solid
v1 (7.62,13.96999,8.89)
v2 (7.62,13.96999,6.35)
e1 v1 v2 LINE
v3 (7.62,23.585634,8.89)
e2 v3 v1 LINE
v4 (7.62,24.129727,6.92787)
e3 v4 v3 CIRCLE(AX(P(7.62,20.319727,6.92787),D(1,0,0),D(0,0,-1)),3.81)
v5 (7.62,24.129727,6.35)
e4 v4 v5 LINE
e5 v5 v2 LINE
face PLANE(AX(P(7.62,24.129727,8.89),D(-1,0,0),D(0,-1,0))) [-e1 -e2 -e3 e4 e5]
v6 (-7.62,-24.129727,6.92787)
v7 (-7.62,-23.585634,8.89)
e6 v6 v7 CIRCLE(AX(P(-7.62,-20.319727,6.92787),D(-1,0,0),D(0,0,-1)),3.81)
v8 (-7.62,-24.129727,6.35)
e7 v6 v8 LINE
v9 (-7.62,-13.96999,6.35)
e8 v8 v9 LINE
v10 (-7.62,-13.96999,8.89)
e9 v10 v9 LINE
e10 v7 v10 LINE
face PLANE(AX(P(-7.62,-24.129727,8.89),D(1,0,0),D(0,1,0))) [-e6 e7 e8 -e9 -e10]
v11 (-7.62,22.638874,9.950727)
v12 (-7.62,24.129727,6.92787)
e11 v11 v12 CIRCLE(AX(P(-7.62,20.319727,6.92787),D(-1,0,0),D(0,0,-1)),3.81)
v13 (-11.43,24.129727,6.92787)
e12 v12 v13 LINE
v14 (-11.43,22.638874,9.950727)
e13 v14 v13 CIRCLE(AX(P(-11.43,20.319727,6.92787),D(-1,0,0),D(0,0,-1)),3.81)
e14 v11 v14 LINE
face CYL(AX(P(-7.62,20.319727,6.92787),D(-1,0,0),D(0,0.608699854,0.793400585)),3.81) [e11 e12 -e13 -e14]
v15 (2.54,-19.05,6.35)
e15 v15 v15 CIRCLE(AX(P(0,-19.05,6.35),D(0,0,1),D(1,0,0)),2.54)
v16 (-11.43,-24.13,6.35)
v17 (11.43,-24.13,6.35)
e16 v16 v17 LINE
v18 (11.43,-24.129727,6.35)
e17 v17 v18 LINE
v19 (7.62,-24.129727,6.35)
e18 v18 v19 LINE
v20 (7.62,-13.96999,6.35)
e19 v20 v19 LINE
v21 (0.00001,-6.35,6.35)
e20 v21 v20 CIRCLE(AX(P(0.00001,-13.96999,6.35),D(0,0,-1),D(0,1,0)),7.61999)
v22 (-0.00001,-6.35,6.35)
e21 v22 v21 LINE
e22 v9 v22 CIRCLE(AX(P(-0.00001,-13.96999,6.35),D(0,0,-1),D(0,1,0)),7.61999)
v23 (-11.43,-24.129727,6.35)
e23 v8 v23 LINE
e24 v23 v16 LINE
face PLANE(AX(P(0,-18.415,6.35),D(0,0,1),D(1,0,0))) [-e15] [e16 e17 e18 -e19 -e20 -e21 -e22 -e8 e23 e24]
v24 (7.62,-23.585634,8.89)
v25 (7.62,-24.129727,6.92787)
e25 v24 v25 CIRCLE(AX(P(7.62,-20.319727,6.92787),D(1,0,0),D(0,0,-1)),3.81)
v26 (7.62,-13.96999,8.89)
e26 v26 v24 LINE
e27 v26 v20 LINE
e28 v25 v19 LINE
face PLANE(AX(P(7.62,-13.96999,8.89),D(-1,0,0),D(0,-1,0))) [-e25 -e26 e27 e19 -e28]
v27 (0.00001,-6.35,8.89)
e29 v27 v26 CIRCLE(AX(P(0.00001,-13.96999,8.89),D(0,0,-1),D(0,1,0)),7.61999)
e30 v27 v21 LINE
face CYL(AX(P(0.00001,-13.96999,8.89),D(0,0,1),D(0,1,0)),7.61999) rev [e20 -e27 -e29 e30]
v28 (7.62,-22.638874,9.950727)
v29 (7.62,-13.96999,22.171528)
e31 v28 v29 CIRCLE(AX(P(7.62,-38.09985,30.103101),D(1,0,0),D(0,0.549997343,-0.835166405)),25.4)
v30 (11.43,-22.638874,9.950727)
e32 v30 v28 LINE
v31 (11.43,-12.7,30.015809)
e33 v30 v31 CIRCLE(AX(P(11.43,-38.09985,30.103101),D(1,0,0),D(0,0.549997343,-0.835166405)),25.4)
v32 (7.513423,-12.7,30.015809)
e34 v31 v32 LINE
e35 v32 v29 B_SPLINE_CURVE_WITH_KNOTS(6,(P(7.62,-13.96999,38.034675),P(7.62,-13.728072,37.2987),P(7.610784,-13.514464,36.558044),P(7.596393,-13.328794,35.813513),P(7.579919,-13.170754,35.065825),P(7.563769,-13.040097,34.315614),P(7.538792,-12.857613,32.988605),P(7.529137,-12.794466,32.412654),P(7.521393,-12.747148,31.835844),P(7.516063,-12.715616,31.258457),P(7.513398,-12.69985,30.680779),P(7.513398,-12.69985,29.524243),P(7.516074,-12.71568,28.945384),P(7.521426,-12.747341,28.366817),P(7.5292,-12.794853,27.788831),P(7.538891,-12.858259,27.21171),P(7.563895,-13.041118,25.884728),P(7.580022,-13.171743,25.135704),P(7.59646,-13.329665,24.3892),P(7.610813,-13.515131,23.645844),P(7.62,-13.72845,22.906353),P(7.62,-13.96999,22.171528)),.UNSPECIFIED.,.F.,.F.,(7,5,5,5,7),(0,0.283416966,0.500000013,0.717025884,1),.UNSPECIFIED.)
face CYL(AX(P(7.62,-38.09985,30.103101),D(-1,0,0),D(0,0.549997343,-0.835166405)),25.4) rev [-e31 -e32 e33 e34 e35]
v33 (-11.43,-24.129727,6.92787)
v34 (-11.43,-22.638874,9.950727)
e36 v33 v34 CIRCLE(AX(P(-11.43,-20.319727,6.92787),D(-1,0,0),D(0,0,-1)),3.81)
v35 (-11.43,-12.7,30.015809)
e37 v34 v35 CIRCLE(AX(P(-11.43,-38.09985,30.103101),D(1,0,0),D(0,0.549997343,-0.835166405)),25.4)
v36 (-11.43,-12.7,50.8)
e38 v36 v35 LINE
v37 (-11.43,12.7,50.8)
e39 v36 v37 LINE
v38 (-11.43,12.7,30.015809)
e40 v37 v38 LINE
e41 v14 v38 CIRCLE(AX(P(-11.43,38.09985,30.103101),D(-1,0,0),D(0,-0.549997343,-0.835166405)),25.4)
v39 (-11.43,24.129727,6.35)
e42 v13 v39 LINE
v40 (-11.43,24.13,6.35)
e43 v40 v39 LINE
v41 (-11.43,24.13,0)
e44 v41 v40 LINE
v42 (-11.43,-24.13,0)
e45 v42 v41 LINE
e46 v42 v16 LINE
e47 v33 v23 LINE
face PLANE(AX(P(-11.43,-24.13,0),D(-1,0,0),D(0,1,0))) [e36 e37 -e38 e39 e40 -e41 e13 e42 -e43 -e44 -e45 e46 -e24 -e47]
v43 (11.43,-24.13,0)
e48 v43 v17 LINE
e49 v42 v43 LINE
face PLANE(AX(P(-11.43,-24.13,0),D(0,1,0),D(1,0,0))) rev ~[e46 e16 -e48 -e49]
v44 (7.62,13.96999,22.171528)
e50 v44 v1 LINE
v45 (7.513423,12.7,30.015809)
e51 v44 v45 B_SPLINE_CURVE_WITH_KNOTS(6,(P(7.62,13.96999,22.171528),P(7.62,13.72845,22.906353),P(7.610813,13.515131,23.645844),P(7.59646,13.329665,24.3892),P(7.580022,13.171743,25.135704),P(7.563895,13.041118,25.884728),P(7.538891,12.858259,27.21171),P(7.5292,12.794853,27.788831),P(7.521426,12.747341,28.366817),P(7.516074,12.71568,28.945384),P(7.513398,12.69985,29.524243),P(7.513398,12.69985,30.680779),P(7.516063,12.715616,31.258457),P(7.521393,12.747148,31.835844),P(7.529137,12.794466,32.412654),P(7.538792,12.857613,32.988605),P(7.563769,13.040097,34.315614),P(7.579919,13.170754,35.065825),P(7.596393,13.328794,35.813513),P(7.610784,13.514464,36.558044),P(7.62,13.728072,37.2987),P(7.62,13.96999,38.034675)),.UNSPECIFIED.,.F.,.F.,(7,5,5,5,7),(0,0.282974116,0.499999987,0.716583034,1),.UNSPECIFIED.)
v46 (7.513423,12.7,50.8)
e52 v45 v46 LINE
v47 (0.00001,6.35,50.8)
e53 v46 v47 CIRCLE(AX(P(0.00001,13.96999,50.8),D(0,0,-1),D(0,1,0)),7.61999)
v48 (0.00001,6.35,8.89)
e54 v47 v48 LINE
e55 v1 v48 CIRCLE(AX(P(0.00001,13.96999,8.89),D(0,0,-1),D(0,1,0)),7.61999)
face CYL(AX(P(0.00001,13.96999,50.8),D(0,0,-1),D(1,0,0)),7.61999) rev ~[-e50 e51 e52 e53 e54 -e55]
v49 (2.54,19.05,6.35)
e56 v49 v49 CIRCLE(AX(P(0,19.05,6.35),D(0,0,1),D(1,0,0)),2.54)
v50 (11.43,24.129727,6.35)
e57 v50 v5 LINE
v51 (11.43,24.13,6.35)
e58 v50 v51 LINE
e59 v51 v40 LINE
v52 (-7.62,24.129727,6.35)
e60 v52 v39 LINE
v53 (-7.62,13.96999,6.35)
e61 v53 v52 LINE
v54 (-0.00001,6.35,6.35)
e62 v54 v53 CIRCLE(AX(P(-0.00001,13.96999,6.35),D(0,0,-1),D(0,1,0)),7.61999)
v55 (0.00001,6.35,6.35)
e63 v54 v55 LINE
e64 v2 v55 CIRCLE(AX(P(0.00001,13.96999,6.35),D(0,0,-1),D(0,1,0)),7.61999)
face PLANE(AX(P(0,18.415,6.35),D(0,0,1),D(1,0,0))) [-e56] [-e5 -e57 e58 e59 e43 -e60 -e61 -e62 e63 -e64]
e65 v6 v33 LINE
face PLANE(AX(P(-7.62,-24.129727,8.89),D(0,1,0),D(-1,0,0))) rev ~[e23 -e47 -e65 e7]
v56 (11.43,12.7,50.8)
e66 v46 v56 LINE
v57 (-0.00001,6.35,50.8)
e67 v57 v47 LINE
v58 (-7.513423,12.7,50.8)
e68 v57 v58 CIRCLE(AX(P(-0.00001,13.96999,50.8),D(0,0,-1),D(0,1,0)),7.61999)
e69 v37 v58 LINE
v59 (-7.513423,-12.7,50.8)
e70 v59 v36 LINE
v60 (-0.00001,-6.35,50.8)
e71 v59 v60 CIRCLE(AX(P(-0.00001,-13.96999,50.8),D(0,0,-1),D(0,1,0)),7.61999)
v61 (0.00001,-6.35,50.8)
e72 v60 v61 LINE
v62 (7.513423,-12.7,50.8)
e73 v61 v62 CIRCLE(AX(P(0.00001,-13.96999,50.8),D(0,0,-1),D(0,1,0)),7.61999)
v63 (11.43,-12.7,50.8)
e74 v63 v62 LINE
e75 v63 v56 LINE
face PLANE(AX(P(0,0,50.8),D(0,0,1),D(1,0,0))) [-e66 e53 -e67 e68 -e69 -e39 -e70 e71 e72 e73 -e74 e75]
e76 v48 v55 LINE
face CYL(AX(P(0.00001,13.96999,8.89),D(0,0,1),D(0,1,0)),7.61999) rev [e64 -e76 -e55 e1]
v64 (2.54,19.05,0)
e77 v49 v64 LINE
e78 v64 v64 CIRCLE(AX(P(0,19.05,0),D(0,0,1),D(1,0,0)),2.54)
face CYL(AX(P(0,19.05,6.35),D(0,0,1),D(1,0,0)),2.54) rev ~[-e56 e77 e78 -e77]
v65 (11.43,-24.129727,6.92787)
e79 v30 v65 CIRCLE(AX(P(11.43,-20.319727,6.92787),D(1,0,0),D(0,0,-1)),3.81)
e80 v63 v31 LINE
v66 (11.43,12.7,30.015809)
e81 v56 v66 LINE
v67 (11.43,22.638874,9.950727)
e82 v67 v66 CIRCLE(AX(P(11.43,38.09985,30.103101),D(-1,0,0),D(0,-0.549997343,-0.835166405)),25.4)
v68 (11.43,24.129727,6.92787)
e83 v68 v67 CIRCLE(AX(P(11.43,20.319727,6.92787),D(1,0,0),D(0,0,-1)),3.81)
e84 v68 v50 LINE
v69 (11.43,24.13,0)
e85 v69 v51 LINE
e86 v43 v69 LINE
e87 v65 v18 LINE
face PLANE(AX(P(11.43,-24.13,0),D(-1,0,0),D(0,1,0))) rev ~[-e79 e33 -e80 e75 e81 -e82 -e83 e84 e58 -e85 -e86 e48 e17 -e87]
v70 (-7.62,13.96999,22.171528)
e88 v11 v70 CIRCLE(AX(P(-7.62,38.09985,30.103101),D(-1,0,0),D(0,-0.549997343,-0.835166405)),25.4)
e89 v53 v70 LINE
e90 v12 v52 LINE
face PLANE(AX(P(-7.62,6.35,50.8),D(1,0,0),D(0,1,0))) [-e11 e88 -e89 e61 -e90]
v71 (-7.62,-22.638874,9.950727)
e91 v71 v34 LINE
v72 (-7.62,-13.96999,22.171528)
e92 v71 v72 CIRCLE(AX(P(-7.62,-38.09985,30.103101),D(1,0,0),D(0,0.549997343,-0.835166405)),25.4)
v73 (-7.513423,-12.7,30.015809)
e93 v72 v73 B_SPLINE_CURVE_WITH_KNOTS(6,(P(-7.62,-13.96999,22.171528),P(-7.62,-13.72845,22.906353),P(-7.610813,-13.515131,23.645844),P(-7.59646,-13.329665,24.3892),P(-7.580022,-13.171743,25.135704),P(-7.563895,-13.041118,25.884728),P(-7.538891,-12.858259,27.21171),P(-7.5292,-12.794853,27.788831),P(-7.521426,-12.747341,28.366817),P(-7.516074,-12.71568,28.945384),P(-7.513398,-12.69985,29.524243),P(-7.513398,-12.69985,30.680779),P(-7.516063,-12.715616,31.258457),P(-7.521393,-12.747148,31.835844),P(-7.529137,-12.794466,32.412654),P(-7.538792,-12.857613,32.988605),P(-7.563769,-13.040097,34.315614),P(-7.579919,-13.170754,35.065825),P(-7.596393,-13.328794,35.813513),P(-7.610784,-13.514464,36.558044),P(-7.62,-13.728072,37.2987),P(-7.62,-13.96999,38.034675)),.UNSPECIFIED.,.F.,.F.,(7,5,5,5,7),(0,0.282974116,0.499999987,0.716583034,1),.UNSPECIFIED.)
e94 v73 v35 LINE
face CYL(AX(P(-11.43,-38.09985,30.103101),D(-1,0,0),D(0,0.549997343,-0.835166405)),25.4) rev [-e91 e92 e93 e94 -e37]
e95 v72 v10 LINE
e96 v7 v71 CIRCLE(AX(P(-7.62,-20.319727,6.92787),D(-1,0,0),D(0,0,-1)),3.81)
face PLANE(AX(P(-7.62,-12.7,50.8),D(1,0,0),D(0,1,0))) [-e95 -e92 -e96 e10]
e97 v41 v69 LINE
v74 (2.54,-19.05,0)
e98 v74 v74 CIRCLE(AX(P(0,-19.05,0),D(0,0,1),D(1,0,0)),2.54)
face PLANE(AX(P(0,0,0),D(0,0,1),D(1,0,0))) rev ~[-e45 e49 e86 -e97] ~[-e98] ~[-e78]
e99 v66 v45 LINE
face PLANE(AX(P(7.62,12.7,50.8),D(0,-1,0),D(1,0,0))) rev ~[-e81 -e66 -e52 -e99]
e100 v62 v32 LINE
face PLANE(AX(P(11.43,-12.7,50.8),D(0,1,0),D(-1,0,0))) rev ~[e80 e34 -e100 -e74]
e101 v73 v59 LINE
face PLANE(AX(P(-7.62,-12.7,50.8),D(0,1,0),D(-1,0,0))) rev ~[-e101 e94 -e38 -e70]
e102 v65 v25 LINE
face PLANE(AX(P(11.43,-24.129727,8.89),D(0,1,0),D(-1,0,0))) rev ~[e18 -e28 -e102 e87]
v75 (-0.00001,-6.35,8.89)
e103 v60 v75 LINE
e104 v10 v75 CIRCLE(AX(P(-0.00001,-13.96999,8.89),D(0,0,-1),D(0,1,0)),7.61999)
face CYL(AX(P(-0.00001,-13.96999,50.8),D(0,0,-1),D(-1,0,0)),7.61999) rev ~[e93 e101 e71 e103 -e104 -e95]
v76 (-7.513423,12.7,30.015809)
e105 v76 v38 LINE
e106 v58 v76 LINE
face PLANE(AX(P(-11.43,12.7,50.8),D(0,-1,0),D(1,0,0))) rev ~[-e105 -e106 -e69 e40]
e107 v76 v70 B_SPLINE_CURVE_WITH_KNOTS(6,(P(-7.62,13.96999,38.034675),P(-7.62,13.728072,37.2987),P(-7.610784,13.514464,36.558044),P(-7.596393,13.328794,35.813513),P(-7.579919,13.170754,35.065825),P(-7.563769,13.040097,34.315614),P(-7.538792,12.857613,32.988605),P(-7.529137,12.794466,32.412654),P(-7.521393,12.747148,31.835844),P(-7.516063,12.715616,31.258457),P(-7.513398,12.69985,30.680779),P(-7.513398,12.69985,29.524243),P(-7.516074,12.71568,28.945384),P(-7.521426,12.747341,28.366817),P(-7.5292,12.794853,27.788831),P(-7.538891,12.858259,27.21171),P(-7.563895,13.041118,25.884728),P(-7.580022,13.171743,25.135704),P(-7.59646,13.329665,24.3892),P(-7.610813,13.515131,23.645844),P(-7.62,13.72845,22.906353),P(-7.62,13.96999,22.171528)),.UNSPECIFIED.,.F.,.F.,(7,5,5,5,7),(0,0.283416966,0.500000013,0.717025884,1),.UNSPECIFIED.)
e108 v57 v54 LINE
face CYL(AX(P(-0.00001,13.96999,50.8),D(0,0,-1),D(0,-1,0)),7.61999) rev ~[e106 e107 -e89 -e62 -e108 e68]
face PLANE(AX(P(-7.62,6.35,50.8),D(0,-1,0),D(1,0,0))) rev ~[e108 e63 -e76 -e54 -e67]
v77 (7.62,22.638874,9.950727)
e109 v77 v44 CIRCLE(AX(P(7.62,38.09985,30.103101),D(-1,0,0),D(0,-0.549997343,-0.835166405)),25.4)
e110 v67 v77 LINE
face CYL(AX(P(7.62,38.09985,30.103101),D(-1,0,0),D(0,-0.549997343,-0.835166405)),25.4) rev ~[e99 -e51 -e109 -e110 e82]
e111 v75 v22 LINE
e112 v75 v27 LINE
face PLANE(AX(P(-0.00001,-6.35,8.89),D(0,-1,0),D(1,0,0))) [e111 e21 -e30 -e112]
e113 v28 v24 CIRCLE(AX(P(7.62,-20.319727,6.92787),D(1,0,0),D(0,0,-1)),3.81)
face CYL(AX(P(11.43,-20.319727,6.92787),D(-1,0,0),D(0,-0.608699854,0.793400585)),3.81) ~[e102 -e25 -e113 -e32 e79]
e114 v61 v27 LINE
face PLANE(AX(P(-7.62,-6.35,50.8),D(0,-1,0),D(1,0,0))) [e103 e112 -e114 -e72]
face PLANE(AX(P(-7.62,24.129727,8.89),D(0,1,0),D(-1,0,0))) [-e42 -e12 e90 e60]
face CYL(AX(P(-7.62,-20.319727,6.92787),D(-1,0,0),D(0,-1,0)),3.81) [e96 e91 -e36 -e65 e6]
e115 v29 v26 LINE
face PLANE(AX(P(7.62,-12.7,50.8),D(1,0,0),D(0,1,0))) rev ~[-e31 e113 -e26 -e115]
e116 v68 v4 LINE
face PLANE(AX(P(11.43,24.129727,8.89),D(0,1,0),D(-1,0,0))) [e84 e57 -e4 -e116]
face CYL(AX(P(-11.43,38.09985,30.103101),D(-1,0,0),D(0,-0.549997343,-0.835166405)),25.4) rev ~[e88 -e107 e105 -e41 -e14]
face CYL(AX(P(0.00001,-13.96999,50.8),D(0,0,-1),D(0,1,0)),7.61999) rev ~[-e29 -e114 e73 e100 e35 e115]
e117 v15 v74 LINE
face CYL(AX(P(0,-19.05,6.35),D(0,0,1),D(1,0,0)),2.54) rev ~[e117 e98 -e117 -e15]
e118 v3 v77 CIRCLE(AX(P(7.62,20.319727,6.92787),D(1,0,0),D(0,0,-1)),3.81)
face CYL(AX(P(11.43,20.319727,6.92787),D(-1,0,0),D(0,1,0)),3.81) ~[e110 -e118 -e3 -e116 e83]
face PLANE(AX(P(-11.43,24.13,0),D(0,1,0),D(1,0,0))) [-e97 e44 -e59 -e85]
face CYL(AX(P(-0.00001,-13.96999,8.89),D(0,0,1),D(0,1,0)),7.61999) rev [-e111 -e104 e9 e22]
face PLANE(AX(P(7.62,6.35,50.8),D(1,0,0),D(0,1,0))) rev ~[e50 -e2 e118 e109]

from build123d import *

# Parameters (mm, degrees)
F0_W         = 22.86
F0_H         = 48.26
F1_DEPTH     = 50.8
F2_W         = 15.24
F2_H         = 6.35
F3_DEPTH     = 41.91
F4_T1_DEPTH  = 3.81
F4_T3_DEPTH  = 3.81
F4_T8_DEPTH  = 56.8427535009
F4_T14_DEPTH = 56.8427535009
F4_T20_DEPTH = 56.8427535009
F4_T26_DEPTH = 56.8427535009
F5_R         = 7.61999
F6_DEPTH     = 2.54
F7_R         = 3.81
F8_R         = 2.54
F9_DEPTH     = 25.4


# Not quite as in the source:
# - a fillet or chamfer that OpenCascade refuses, or shapes differently, is made with other operations: its cross-section is extruded or revolved along the edge and cut away or added
# - a fillet or chamfer is up to 0.001 mm smaller than in the source, because OpenCascade refuses the exact size


with BuildPart() as f1:
    # F0 (on Top) → F1 (new body)
    with BuildSketch(Plane.XY):
        Rectangle(F0_W, F0_H)
    extrude(amount=F1_DEPTH)

    # F2 (on face) → F3 (cut)
    with BuildSketch(Plane.XY.offset(50.8)):
        Polygon((11.43, 24.13), (-11.43, 24.13), (-11.43, 12.7), (-7.62, 12.7), (7.62, 12.7), (11.43, 12.7), align=None)
        with Locations((0, 9.525)):
            Rectangle(F2_W, F2_H)
        Polygon((-11.43, -12.7), (-11.43, -24.13), (11.43, -24.13), (11.43, -12.7), (7.62, -12.7), (-7.62, -12.7), align=None)
        with Locations((0, -9.525)):
            Rectangle(F2_W, F2_H)
    extrude(amount=-F3_DEPTH, mode=Mode.SUBTRACT)

    # F4: fillet of radius 25.4 on 4 edges, made by hand

    # F4_s2 → F4_t1 (join)
    with BuildSketch(Plane.YZ.offset(-11.43)):
        with BuildLine():
            ThreePointArc((-24.1299175004, 8.889874725), (-15.7392117545, 18.0547879388), (-12.69985, 30.1031013998))
            Line((-12.69985, 30.1031013998), (-12.19185, 30.1031013998))
            ThreePointArc((-12.19185, 30.1031013998), (-12.192, 19.4965506999), (-12.192, 8.89))
            Line((-12.192, 8.89), (-12.7, 8.382))
            ThreePointArc((-12.7, 8.382), (-18.4149587502, 8.382), (-23.8505188504, 8.4656101915))
            Line((-23.8505188504, 8.4656101915), (-24.1299175004, 8.889874725))
        make_face()
        with BuildLine():
            ThreePointArc((24.1299175004, 8.889874725), (15.7392117545, 18.0547879388), (12.69985, 30.1031013998))
            Line((12.69985, 30.1031013998), (12.19185, 30.1031013998))
            ThreePointArc((12.19185, 30.1031013998), (12.192, 19.4965506999), (12.192, 8.89))
            Line((12.192, 8.89), (12.7, 8.382))
            ThreePointArc((12.7, 8.382), (18.4149587502, 8.382), (23.8505188504, 8.4656101915))
            Line((23.8505188504, 8.4656101915), (24.1299175004, 8.889874725))
        make_face()
    extrude(amount=F4_T1_DEPTH)

    # F4_s4 → F4_t3 (join)
    with BuildSketch(Plane.YZ.offset(7.62)):
        with BuildLine():
            ThreePointArc((-24.1299175004, 8.889874725), (-15.7392117545, 18.0547879388), (-12.69985, 30.1031013998))
            Line((-12.69985, 30.1031013998), (-12.19185, 30.1031013998))
            ThreePointArc((-12.19185, 30.1031013998), (-12.192, 19.4965506999), (-12.192, 8.89))
            Line((-12.192, 8.89), (-12.7, 8.382))
            ThreePointArc((-12.7, 8.382), (-18.4149587502, 8.382), (-23.8505188504, 8.4656101915))
            Line((-23.8505188504, 8.4656101915), (-24.1299175004, 8.889874725))
        make_face()
        with BuildLine():
            ThreePointArc((24.1299175004, 8.889874725), (15.7392117545, 18.0547879388), (12.69985, 30.1031013998))
            Line((12.69985, 30.1031013998), (12.19185, 30.1031013998))
            ThreePointArc((12.19185, 30.1031013998), (12.192, 19.4965506999), (12.192, 8.89))
            Line((12.192, 8.89), (12.7, 8.382))
            ThreePointArc((12.7, 8.382), (18.4149587502, 8.382), (23.8505188504, 8.4656101915))
            Line((23.8505188504, 8.4656101915), (24.1299175004, 8.889874725))
        make_face()
    extrude(amount=F4_T3_DEPTH)


with BuildPart() as f4_tool6:
    # F4_s7 → F4_t8 (new body)
    with BuildSketch(Plane.YZ.offset(45.4127535009)):
        with BuildLine():
            ThreePointArc((-24.1299175004, 8.889874725), (-15.7392117545, 18.0547879388), (-12.69985, 30.1031013998))
            Line((-12.69985, 30.1031013998), (-12.19185, 30.1031013998))
            ThreePointArc((-12.19185, 30.1031013998), (-12.192, 19.4965506999), (-12.192, 8.89))
            Line((-12.192, 8.89), (-12.7, 8.382))
            ThreePointArc((-12.7, 8.382), (-18.4149587502, 8.382), (-23.8505188504, 8.4656101915))
            Line((-23.8505188504, 8.4656101915), (-24.1299175004, 8.889874725))
        make_face()
    extrude(amount=-F4_T8_DEPTH)

    split(bisect_by=Plane.YZ.offset(11.43), keep=Keep.BOTTOM)

    split(bisect_by=Plane.YZ.offset(7.62), keep=Keep.TOP)


with BuildPart() as f1_1:
    add(f1.part)

    # F4_t5: union F4_tool6
    add(f4_tool6.part)


with BuildPart() as f4_tool12:
    # F4_s13 → F4_t14 (new body)
    with BuildSketch(Plane.YZ.offset(11.43)):
        with BuildLine():
            ThreePointArc((-24.1299175004, 8.889874725), (-15.7392117545, 18.0547879388), (-12.69985, 30.1031013998))
            Line((-12.69985, 30.1031013998), (-12.19185, 30.1031013998))
            ThreePointArc((-12.19185, 30.1031013998), (-12.192, 19.4965506999), (-12.192, 8.89))
            Line((-12.192, 8.89), (-12.7, 8.382))
            ThreePointArc((-12.7, 8.382), (-18.4149587502, 8.382), (-23.8505188504, 8.4656101915))
            Line((-23.8505188504, 8.4656101915), (-24.1299175004, 8.889874725))
        make_face()
    extrude(amount=-F4_T14_DEPTH)

    split(bisect_by=Plane.YZ.offset(-11.43), keep=Keep.TOP)

    split(bisect_by=Plane.YZ.offset(-7.62), keep=Keep.BOTTOM)


with BuildPart() as f1_2:
    add(f1_1.part)

    # F4_t11: union F4_tool12
    add(f4_tool12.part)


with BuildPart() as f4_tool18:
    # F4_s19 → F4_t20 (new body)
    with BuildSketch(Plane.YZ.offset(-11.43)):
        with BuildLine():
            ThreePointArc((24.1299175004, 8.889874725), (15.7392117545, 18.0547879388), (12.69985, 30.1031013998))
            Line((12.69985, 30.1031013998), (12.19185, 30.1031013998))
            ThreePointArc((12.19185, 30.1031013998), (12.192, 19.4965506999), (12.192, 8.89))
            Line((12.192, 8.89), (12.7, 8.382))
            ThreePointArc((12.7, 8.382), (18.4149587502, 8.382), (23.8505188504, 8.4656101915))
            Line((23.8505188504, 8.4656101915), (24.1299175004, 8.889874725))
        make_face()
    extrude(amount=F4_T20_DEPTH)

    split(bisect_by=Plane.YZ.offset(11.43), keep=Keep.BOTTOM)

    split(bisect_by=Plane.YZ.offset(7.62), keep=Keep.TOP)


with BuildPart() as f1_3:
    add(f1_2.part)

    # F4_t17: union F4_tool18
    add(f4_tool18.part)


with BuildPart() as f4_tool24:
    # F4_s25 → F4_t26 (new body)
    with BuildSketch(Plane.YZ.offset(-45.4127535009)):
        with BuildLine():
            ThreePointArc((24.1299175004, 8.889874725), (15.7392117545, 18.0547879388), (12.69985, 30.1031013998))
            Line((12.69985, 30.1031013998), (12.19185, 30.1031013998))
            ThreePointArc((12.19185, 30.1031013998), (12.192, 19.4965506999), (12.192, 8.89))
            Line((12.192, 8.89), (12.7, 8.382))
            ThreePointArc((12.7, 8.382), (18.4149587502, 8.382), (23.8505188504, 8.4656101915))
            Line((23.8505188504, 8.4656101915), (24.1299175004, 8.889874725))
        make_face()
    extrude(amount=F4_T26_DEPTH)

    split(bisect_by=Plane.YZ.offset(-11.43), keep=Keep.TOP)

    split(bisect_by=Plane.YZ.offset(-7.62), keep=Keep.BOTTOM)


with BuildPart() as f1_4:
    add(f1_3.part)

    # F4_t23: union F4_tool24
    add(f4_tool24.part)

    # F5 (radius 7.62 in the source; OpenCascade refuses exactly that, so slightly less here)
    f5_edges = [f1_4.edges().sort_by_distance(p)[0] for p in [
        (7.62, 6.35, 29.845),
        (-7.62, 6.35, 29.845),
        (7.62, -6.35, 29.845),
        (-7.62, -6.35, 29.845),
    ]]
    fillet(f5_edges, radius=F5_R)

    # F6 (cut): faces of the model
    f6_faces = [f1_4.faces().sort_by_distance(p)[0] for p in [
        (0, 15.9681179393, 8.89),
        (0, -15.9681179393, 8.89),
    ]]
    extrude(f6_faces, amount=-F6_DEPTH, mode=Mode.SUBTRACT)

    # F7
    f7_edges = [f1_4.edges().sort_by_distance(p)[0] for p in [
        (9.525, 24.129727, 8.89),
        (9.525, -24.129727, 8.89),
        (-9.525, 24.129727, 8.89),
        (-9.525, -24.129727, 8.89),
    ]]
    fillet(f7_edges, radius=F7_R)

    # F8 (on face) → F9 (cut)
    with BuildSketch(Plane.XY.offset(6.35)):
        with Locations((0, -19.05)):
            Circle(F8_R)
        with Locations((0, 19.05)):
            Circle(F8_R)
    extrude(amount=-F9_DEPTH, mode=Mode.SUBTRACT)


solid = f1_4.part
